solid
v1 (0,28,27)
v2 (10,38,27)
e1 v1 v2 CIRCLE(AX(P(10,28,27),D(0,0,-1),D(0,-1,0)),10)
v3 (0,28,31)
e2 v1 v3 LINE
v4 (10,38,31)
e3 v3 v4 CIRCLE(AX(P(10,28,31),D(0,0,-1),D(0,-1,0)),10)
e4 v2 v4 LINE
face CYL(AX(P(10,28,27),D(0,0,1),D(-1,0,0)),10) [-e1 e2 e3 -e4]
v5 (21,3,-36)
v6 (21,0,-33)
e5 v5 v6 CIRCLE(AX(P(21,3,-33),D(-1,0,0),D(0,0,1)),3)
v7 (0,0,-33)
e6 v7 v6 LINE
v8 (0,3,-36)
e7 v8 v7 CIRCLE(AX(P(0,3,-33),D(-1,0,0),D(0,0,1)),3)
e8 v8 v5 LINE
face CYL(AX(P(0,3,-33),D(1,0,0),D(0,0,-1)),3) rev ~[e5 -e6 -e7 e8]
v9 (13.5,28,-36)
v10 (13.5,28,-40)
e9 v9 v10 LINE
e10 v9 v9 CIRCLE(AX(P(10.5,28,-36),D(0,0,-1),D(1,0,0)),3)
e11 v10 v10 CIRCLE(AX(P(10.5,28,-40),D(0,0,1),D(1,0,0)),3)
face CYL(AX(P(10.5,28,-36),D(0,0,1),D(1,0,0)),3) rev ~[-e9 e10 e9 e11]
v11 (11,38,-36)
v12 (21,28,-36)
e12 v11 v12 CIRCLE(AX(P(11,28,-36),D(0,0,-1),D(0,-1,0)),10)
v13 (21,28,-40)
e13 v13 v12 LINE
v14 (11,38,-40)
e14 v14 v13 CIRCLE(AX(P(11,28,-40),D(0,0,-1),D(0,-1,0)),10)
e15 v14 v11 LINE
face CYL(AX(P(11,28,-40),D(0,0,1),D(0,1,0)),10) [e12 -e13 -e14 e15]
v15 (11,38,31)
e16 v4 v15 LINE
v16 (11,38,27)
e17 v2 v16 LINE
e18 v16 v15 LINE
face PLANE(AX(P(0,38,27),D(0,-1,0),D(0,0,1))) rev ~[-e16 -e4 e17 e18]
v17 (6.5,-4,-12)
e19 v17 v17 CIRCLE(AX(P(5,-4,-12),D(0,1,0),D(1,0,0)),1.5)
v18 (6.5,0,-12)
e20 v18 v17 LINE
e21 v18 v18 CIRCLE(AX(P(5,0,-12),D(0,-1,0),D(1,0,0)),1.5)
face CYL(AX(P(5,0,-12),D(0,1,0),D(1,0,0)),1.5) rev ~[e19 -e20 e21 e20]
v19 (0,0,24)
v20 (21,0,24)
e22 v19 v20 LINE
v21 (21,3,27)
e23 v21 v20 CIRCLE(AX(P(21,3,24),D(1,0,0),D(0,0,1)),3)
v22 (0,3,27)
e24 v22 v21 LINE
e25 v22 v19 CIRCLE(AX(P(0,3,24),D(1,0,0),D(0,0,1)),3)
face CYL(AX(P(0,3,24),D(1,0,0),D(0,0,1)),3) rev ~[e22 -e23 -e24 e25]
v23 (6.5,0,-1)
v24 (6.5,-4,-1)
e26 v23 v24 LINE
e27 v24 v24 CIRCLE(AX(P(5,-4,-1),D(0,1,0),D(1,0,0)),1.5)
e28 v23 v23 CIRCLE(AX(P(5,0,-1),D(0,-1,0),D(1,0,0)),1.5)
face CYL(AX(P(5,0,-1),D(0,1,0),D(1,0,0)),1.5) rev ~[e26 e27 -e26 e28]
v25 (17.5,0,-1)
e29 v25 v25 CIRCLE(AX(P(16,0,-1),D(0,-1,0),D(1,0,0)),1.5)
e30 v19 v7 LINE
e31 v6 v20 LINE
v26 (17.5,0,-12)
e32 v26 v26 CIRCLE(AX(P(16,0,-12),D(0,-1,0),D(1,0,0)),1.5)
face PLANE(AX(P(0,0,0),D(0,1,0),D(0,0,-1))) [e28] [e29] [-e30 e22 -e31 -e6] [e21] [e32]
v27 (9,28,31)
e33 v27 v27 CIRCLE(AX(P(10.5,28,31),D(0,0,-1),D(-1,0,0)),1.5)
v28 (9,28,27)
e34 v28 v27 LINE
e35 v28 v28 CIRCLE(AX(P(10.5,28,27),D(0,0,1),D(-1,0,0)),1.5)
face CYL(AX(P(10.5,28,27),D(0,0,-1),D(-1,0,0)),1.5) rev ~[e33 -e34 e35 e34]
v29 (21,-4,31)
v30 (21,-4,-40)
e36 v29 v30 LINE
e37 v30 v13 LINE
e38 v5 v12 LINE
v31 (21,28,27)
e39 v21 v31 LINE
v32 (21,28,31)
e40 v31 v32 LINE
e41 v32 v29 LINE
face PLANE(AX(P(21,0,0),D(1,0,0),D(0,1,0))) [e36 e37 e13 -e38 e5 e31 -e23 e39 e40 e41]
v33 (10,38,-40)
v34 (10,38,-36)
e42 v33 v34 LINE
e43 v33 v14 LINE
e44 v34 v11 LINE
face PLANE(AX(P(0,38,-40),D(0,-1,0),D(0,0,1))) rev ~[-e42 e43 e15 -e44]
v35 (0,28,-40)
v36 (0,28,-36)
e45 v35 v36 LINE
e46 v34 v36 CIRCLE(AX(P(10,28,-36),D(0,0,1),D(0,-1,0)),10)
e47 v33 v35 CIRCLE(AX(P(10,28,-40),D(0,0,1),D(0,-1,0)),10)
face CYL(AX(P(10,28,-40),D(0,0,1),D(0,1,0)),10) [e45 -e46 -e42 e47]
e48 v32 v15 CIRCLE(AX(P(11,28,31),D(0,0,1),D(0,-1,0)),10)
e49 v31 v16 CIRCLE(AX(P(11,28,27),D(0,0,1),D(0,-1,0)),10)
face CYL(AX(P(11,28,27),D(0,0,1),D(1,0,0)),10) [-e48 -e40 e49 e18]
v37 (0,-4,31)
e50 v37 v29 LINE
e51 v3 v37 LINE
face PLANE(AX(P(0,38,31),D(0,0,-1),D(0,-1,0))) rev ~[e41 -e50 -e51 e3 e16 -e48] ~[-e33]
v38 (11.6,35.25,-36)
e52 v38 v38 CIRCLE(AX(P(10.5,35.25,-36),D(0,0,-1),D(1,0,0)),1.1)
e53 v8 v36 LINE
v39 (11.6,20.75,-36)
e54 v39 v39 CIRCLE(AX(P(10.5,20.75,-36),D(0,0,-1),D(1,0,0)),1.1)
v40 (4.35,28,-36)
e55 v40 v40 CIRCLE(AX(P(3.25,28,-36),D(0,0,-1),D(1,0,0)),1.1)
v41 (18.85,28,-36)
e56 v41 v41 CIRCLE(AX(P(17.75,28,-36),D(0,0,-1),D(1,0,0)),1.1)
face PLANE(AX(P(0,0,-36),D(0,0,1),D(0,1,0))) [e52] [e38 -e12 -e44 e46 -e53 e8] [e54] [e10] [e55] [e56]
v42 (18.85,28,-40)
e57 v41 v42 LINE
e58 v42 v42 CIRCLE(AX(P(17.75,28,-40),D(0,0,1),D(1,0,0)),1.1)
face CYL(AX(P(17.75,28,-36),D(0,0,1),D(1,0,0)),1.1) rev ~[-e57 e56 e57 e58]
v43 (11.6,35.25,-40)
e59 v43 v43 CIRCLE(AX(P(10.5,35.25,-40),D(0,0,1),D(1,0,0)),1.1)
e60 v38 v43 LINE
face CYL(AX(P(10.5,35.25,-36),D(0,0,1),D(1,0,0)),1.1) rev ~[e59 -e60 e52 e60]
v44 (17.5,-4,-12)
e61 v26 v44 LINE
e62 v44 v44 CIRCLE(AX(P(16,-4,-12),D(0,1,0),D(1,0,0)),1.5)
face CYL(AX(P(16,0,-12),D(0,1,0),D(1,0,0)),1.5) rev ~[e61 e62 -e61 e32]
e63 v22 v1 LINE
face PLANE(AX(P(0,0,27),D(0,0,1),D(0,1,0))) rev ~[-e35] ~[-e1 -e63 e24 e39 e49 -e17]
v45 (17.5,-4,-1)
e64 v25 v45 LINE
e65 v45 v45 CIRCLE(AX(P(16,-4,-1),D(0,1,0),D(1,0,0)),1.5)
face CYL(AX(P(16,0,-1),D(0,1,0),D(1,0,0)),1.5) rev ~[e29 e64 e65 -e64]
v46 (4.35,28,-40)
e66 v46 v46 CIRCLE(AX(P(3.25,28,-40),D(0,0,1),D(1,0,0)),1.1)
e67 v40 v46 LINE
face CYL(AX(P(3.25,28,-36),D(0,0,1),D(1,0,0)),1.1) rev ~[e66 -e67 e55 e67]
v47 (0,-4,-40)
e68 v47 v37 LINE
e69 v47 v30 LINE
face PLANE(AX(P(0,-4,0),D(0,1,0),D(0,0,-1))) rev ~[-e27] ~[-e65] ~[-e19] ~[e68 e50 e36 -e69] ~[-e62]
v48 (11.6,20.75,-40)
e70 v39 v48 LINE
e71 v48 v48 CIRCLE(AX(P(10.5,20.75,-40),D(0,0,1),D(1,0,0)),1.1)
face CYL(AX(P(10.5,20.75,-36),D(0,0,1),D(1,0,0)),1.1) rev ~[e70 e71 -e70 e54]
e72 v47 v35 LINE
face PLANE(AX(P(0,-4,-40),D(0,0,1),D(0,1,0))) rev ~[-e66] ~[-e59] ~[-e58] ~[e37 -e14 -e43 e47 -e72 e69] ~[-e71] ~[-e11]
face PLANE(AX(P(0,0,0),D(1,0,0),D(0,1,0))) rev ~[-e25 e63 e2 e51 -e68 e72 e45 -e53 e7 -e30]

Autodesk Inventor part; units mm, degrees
ref_plane "YZ Plane" through (0, 0, 0) normal (1, 0, 0) x (0, 1, 0)
ref_plane "XZ Plane" through (0, 0, 0) normal (0, 1, 0) x (-1, 0, 0)
ref_plane "XY Plane" through (0, 0, 0) normal (0, 0, 1) x (1, 0, 0)
sketch "Sketch1" plane through (0, 0, 0) normal (1, 0, 0) x (0, 1, 0)
  line L0 (0, 0) -> (0, -36)
  line L1 (0, -36) -> (38, -36)
  line L2 (0, 0) -> (-4, 0)
  line L3 (-4, 0) -> (-4, -40)
  line L4 (-4, -40) -> (38, -40)
  line L5 (38, -40) -> (38, -36)
  line L6 (0, 0) -> (-4, 0)
  line L7 (-4, 0) -> (-4, 27)
  line L8 (-4, 27) -> (0, 27)
  line L9 (0, 27) -> (0, 0)
  line L10 (-4, 27) -> (38, 27)
  line L11 (38, 27) -> (38, 31)
  line L12 (38, 31) -> (-4, 31)
  line L13 (-4, 31) -> (-4, 27)
  dimension "d0" = 36
  dimension "d1" = 38
  dimension "d2" = 4
  dimension "d3" = 40
  dimension "d28" = 27
  dimension "d29" = 42
  dimension "d30" = 4
extrude "Extrusion1" add sketch "Sketch1" along normal blind 21 contours L0 L1 L5 L4 L3 L2
fillet "Fillet1" radius 10 2 edges at (21, 38, -38) (0, 38, -38)
sketch "Sketch2" plane through (0, 0, -36) normal (0, 0, 1) x (1, 0, 0)
  arc A0 (10, 38) -> (0, 28) centre (10, 28) ccw projected
  line L0 (0, 28) -> (21, 28)
  line L1 (0, 28) -> (0, 0) projected
  line L2 (0, 28) -> (10.5, 28)
  circle A1 centre (10.5, 28) radius 8
  circle A2 centre (10.5, 28) radius 6.5
  line L3 (4, 28) -> (2.5, 28)
  circle A3 centre (3.25, 28) radius 1.1
  line L4 (17, 28) -> (18.5, 28)
  circle A4 centre (17.75, 28) radius 1.1
  line L5 (10.5, 28) -> (10.5, 36)
  line L6 (10.5, 28) -> (10.5, 20)
  line L7 (10.5, 36) -> (10.5, 34.5)
  line L8 (10.5, 20) -> (10.5, 21.5)
  circle A5 centre (10.5, 35.25) radius 1.1
  circle A6 centre (10.5, 20.75) radius 1.1
  circle A7 centre (10.5, 28) radius 3
  dimension "d7" = 10.5
  dimension "d8" = 16
  dimension "d9" = 13
  dimension "d10" = 2.2
  dimension "d11" = 2.2
  dimension "d12" = 2.2
  dimension "d13" = 2.2
  dimension "d14" = 6
extrude "Extrusion2" cut sketch "Sketch2" against normal blind 21 contours A2 A3 A1 L0 | A2 A3 L0 | L0 A1 A3 A2 | L0 A3 A2 | A1 A3 L0 | L0 A3 A1 | A7 L5 L0 | L0 L6 A7 | A5 A1 L5 A2 | A2 L5 A5 | A6 L6 A2 | A2 L6 A1 A6 | A5 A1 | A1 A6 | L5 A7 L0 | L0 A7 L6 | L5 A1 A5 A2 | A2 A5 L5 | L6 A6 A2 | A2 A6 A1 L6 | A4 L0 A1 | A1 L0 A2 A4 | A4 A2 L0 A1 | A1 L0 A4 | A4 A2 L0 | L0 A2 A4
fillet "Fillet2" radius 3 1 edges at (10.5, 0, -36)
extrude "Extrusion4" add sketch "Sketch1" along normal up to surface (21 mm away) contours L2 L7 L8 L9 | L8 L13 L12 L11 L10
fillet "Fillet3" radius 10 2 edges at (0, 38, 29) (21, 38, 29)
fillet "Fillet4" radius 3 1 edges at (10.5, 0, 27)
sketch "Sketch4" plane through (11, 38, 27) normal (0, 0, -1) x (-1, 0, 0)
  line L0 (-10, -10) -> (0.5, -10)
  circle A0 centre (0.5, -10) radius 1.5
  point P0 (11, -38)
  dimension "d35" = 10.5
  dimension "d36" = 3
extrude "Extrusion5" cut sketch "Sketch4" against normal blind 10
sketch "Sketch5" plane through (0, 0, -33) normal (0, 1, 0) x (1, 0, 0)
  line L0 (0, -57) -> (0, -60) projected
  line L1 (0, -57) -> (0, -32)
  line L2 (0, 0) -> (0, -57) projected
  line L3 (0, -32) -> (5, -32)
  line L4 (21, 0) -> (21, -57) projected
  line L5 (5, -32) -> (16, -32)
  line L6 (5, -32) -> (16, -32)
  line L7 (16, -32) -> (16, -21)
  line L8 (16, -21) -> (5, -21)
  line L9 (5, -21) -> (5, -32)
  circle A0 centre (5, -21) radius 1.5
  circle A1 centre (16, -21) radius 1.5
  circle A2 centre (5, -32) radius 1.5
  circle A3 centre (16, -32) radius 1.5
  point P0 (0, -33)
  dimension "d40" = 25
  dimension "d41" = 5
  dimension "d42" = 11
  dimension "d43" = 11
  dimension "d44" = 11
  dimension "d45" = 3
  dimension "d46" = 3
  dimension "d47" = 3
  dimension "d48" = 3
extrude "Extrusion6" cut sketch "Sketch5" against normal blind 10 contours A2 L9 L3 | L3 L5 A2 | L9 A2 L5 | A0 L8 L9 | L9 L8 A0 | A3 L7 L5 | L5 L7 A3 | A1 L7 L8 | L8 L7 A1
properties part number "L1"
